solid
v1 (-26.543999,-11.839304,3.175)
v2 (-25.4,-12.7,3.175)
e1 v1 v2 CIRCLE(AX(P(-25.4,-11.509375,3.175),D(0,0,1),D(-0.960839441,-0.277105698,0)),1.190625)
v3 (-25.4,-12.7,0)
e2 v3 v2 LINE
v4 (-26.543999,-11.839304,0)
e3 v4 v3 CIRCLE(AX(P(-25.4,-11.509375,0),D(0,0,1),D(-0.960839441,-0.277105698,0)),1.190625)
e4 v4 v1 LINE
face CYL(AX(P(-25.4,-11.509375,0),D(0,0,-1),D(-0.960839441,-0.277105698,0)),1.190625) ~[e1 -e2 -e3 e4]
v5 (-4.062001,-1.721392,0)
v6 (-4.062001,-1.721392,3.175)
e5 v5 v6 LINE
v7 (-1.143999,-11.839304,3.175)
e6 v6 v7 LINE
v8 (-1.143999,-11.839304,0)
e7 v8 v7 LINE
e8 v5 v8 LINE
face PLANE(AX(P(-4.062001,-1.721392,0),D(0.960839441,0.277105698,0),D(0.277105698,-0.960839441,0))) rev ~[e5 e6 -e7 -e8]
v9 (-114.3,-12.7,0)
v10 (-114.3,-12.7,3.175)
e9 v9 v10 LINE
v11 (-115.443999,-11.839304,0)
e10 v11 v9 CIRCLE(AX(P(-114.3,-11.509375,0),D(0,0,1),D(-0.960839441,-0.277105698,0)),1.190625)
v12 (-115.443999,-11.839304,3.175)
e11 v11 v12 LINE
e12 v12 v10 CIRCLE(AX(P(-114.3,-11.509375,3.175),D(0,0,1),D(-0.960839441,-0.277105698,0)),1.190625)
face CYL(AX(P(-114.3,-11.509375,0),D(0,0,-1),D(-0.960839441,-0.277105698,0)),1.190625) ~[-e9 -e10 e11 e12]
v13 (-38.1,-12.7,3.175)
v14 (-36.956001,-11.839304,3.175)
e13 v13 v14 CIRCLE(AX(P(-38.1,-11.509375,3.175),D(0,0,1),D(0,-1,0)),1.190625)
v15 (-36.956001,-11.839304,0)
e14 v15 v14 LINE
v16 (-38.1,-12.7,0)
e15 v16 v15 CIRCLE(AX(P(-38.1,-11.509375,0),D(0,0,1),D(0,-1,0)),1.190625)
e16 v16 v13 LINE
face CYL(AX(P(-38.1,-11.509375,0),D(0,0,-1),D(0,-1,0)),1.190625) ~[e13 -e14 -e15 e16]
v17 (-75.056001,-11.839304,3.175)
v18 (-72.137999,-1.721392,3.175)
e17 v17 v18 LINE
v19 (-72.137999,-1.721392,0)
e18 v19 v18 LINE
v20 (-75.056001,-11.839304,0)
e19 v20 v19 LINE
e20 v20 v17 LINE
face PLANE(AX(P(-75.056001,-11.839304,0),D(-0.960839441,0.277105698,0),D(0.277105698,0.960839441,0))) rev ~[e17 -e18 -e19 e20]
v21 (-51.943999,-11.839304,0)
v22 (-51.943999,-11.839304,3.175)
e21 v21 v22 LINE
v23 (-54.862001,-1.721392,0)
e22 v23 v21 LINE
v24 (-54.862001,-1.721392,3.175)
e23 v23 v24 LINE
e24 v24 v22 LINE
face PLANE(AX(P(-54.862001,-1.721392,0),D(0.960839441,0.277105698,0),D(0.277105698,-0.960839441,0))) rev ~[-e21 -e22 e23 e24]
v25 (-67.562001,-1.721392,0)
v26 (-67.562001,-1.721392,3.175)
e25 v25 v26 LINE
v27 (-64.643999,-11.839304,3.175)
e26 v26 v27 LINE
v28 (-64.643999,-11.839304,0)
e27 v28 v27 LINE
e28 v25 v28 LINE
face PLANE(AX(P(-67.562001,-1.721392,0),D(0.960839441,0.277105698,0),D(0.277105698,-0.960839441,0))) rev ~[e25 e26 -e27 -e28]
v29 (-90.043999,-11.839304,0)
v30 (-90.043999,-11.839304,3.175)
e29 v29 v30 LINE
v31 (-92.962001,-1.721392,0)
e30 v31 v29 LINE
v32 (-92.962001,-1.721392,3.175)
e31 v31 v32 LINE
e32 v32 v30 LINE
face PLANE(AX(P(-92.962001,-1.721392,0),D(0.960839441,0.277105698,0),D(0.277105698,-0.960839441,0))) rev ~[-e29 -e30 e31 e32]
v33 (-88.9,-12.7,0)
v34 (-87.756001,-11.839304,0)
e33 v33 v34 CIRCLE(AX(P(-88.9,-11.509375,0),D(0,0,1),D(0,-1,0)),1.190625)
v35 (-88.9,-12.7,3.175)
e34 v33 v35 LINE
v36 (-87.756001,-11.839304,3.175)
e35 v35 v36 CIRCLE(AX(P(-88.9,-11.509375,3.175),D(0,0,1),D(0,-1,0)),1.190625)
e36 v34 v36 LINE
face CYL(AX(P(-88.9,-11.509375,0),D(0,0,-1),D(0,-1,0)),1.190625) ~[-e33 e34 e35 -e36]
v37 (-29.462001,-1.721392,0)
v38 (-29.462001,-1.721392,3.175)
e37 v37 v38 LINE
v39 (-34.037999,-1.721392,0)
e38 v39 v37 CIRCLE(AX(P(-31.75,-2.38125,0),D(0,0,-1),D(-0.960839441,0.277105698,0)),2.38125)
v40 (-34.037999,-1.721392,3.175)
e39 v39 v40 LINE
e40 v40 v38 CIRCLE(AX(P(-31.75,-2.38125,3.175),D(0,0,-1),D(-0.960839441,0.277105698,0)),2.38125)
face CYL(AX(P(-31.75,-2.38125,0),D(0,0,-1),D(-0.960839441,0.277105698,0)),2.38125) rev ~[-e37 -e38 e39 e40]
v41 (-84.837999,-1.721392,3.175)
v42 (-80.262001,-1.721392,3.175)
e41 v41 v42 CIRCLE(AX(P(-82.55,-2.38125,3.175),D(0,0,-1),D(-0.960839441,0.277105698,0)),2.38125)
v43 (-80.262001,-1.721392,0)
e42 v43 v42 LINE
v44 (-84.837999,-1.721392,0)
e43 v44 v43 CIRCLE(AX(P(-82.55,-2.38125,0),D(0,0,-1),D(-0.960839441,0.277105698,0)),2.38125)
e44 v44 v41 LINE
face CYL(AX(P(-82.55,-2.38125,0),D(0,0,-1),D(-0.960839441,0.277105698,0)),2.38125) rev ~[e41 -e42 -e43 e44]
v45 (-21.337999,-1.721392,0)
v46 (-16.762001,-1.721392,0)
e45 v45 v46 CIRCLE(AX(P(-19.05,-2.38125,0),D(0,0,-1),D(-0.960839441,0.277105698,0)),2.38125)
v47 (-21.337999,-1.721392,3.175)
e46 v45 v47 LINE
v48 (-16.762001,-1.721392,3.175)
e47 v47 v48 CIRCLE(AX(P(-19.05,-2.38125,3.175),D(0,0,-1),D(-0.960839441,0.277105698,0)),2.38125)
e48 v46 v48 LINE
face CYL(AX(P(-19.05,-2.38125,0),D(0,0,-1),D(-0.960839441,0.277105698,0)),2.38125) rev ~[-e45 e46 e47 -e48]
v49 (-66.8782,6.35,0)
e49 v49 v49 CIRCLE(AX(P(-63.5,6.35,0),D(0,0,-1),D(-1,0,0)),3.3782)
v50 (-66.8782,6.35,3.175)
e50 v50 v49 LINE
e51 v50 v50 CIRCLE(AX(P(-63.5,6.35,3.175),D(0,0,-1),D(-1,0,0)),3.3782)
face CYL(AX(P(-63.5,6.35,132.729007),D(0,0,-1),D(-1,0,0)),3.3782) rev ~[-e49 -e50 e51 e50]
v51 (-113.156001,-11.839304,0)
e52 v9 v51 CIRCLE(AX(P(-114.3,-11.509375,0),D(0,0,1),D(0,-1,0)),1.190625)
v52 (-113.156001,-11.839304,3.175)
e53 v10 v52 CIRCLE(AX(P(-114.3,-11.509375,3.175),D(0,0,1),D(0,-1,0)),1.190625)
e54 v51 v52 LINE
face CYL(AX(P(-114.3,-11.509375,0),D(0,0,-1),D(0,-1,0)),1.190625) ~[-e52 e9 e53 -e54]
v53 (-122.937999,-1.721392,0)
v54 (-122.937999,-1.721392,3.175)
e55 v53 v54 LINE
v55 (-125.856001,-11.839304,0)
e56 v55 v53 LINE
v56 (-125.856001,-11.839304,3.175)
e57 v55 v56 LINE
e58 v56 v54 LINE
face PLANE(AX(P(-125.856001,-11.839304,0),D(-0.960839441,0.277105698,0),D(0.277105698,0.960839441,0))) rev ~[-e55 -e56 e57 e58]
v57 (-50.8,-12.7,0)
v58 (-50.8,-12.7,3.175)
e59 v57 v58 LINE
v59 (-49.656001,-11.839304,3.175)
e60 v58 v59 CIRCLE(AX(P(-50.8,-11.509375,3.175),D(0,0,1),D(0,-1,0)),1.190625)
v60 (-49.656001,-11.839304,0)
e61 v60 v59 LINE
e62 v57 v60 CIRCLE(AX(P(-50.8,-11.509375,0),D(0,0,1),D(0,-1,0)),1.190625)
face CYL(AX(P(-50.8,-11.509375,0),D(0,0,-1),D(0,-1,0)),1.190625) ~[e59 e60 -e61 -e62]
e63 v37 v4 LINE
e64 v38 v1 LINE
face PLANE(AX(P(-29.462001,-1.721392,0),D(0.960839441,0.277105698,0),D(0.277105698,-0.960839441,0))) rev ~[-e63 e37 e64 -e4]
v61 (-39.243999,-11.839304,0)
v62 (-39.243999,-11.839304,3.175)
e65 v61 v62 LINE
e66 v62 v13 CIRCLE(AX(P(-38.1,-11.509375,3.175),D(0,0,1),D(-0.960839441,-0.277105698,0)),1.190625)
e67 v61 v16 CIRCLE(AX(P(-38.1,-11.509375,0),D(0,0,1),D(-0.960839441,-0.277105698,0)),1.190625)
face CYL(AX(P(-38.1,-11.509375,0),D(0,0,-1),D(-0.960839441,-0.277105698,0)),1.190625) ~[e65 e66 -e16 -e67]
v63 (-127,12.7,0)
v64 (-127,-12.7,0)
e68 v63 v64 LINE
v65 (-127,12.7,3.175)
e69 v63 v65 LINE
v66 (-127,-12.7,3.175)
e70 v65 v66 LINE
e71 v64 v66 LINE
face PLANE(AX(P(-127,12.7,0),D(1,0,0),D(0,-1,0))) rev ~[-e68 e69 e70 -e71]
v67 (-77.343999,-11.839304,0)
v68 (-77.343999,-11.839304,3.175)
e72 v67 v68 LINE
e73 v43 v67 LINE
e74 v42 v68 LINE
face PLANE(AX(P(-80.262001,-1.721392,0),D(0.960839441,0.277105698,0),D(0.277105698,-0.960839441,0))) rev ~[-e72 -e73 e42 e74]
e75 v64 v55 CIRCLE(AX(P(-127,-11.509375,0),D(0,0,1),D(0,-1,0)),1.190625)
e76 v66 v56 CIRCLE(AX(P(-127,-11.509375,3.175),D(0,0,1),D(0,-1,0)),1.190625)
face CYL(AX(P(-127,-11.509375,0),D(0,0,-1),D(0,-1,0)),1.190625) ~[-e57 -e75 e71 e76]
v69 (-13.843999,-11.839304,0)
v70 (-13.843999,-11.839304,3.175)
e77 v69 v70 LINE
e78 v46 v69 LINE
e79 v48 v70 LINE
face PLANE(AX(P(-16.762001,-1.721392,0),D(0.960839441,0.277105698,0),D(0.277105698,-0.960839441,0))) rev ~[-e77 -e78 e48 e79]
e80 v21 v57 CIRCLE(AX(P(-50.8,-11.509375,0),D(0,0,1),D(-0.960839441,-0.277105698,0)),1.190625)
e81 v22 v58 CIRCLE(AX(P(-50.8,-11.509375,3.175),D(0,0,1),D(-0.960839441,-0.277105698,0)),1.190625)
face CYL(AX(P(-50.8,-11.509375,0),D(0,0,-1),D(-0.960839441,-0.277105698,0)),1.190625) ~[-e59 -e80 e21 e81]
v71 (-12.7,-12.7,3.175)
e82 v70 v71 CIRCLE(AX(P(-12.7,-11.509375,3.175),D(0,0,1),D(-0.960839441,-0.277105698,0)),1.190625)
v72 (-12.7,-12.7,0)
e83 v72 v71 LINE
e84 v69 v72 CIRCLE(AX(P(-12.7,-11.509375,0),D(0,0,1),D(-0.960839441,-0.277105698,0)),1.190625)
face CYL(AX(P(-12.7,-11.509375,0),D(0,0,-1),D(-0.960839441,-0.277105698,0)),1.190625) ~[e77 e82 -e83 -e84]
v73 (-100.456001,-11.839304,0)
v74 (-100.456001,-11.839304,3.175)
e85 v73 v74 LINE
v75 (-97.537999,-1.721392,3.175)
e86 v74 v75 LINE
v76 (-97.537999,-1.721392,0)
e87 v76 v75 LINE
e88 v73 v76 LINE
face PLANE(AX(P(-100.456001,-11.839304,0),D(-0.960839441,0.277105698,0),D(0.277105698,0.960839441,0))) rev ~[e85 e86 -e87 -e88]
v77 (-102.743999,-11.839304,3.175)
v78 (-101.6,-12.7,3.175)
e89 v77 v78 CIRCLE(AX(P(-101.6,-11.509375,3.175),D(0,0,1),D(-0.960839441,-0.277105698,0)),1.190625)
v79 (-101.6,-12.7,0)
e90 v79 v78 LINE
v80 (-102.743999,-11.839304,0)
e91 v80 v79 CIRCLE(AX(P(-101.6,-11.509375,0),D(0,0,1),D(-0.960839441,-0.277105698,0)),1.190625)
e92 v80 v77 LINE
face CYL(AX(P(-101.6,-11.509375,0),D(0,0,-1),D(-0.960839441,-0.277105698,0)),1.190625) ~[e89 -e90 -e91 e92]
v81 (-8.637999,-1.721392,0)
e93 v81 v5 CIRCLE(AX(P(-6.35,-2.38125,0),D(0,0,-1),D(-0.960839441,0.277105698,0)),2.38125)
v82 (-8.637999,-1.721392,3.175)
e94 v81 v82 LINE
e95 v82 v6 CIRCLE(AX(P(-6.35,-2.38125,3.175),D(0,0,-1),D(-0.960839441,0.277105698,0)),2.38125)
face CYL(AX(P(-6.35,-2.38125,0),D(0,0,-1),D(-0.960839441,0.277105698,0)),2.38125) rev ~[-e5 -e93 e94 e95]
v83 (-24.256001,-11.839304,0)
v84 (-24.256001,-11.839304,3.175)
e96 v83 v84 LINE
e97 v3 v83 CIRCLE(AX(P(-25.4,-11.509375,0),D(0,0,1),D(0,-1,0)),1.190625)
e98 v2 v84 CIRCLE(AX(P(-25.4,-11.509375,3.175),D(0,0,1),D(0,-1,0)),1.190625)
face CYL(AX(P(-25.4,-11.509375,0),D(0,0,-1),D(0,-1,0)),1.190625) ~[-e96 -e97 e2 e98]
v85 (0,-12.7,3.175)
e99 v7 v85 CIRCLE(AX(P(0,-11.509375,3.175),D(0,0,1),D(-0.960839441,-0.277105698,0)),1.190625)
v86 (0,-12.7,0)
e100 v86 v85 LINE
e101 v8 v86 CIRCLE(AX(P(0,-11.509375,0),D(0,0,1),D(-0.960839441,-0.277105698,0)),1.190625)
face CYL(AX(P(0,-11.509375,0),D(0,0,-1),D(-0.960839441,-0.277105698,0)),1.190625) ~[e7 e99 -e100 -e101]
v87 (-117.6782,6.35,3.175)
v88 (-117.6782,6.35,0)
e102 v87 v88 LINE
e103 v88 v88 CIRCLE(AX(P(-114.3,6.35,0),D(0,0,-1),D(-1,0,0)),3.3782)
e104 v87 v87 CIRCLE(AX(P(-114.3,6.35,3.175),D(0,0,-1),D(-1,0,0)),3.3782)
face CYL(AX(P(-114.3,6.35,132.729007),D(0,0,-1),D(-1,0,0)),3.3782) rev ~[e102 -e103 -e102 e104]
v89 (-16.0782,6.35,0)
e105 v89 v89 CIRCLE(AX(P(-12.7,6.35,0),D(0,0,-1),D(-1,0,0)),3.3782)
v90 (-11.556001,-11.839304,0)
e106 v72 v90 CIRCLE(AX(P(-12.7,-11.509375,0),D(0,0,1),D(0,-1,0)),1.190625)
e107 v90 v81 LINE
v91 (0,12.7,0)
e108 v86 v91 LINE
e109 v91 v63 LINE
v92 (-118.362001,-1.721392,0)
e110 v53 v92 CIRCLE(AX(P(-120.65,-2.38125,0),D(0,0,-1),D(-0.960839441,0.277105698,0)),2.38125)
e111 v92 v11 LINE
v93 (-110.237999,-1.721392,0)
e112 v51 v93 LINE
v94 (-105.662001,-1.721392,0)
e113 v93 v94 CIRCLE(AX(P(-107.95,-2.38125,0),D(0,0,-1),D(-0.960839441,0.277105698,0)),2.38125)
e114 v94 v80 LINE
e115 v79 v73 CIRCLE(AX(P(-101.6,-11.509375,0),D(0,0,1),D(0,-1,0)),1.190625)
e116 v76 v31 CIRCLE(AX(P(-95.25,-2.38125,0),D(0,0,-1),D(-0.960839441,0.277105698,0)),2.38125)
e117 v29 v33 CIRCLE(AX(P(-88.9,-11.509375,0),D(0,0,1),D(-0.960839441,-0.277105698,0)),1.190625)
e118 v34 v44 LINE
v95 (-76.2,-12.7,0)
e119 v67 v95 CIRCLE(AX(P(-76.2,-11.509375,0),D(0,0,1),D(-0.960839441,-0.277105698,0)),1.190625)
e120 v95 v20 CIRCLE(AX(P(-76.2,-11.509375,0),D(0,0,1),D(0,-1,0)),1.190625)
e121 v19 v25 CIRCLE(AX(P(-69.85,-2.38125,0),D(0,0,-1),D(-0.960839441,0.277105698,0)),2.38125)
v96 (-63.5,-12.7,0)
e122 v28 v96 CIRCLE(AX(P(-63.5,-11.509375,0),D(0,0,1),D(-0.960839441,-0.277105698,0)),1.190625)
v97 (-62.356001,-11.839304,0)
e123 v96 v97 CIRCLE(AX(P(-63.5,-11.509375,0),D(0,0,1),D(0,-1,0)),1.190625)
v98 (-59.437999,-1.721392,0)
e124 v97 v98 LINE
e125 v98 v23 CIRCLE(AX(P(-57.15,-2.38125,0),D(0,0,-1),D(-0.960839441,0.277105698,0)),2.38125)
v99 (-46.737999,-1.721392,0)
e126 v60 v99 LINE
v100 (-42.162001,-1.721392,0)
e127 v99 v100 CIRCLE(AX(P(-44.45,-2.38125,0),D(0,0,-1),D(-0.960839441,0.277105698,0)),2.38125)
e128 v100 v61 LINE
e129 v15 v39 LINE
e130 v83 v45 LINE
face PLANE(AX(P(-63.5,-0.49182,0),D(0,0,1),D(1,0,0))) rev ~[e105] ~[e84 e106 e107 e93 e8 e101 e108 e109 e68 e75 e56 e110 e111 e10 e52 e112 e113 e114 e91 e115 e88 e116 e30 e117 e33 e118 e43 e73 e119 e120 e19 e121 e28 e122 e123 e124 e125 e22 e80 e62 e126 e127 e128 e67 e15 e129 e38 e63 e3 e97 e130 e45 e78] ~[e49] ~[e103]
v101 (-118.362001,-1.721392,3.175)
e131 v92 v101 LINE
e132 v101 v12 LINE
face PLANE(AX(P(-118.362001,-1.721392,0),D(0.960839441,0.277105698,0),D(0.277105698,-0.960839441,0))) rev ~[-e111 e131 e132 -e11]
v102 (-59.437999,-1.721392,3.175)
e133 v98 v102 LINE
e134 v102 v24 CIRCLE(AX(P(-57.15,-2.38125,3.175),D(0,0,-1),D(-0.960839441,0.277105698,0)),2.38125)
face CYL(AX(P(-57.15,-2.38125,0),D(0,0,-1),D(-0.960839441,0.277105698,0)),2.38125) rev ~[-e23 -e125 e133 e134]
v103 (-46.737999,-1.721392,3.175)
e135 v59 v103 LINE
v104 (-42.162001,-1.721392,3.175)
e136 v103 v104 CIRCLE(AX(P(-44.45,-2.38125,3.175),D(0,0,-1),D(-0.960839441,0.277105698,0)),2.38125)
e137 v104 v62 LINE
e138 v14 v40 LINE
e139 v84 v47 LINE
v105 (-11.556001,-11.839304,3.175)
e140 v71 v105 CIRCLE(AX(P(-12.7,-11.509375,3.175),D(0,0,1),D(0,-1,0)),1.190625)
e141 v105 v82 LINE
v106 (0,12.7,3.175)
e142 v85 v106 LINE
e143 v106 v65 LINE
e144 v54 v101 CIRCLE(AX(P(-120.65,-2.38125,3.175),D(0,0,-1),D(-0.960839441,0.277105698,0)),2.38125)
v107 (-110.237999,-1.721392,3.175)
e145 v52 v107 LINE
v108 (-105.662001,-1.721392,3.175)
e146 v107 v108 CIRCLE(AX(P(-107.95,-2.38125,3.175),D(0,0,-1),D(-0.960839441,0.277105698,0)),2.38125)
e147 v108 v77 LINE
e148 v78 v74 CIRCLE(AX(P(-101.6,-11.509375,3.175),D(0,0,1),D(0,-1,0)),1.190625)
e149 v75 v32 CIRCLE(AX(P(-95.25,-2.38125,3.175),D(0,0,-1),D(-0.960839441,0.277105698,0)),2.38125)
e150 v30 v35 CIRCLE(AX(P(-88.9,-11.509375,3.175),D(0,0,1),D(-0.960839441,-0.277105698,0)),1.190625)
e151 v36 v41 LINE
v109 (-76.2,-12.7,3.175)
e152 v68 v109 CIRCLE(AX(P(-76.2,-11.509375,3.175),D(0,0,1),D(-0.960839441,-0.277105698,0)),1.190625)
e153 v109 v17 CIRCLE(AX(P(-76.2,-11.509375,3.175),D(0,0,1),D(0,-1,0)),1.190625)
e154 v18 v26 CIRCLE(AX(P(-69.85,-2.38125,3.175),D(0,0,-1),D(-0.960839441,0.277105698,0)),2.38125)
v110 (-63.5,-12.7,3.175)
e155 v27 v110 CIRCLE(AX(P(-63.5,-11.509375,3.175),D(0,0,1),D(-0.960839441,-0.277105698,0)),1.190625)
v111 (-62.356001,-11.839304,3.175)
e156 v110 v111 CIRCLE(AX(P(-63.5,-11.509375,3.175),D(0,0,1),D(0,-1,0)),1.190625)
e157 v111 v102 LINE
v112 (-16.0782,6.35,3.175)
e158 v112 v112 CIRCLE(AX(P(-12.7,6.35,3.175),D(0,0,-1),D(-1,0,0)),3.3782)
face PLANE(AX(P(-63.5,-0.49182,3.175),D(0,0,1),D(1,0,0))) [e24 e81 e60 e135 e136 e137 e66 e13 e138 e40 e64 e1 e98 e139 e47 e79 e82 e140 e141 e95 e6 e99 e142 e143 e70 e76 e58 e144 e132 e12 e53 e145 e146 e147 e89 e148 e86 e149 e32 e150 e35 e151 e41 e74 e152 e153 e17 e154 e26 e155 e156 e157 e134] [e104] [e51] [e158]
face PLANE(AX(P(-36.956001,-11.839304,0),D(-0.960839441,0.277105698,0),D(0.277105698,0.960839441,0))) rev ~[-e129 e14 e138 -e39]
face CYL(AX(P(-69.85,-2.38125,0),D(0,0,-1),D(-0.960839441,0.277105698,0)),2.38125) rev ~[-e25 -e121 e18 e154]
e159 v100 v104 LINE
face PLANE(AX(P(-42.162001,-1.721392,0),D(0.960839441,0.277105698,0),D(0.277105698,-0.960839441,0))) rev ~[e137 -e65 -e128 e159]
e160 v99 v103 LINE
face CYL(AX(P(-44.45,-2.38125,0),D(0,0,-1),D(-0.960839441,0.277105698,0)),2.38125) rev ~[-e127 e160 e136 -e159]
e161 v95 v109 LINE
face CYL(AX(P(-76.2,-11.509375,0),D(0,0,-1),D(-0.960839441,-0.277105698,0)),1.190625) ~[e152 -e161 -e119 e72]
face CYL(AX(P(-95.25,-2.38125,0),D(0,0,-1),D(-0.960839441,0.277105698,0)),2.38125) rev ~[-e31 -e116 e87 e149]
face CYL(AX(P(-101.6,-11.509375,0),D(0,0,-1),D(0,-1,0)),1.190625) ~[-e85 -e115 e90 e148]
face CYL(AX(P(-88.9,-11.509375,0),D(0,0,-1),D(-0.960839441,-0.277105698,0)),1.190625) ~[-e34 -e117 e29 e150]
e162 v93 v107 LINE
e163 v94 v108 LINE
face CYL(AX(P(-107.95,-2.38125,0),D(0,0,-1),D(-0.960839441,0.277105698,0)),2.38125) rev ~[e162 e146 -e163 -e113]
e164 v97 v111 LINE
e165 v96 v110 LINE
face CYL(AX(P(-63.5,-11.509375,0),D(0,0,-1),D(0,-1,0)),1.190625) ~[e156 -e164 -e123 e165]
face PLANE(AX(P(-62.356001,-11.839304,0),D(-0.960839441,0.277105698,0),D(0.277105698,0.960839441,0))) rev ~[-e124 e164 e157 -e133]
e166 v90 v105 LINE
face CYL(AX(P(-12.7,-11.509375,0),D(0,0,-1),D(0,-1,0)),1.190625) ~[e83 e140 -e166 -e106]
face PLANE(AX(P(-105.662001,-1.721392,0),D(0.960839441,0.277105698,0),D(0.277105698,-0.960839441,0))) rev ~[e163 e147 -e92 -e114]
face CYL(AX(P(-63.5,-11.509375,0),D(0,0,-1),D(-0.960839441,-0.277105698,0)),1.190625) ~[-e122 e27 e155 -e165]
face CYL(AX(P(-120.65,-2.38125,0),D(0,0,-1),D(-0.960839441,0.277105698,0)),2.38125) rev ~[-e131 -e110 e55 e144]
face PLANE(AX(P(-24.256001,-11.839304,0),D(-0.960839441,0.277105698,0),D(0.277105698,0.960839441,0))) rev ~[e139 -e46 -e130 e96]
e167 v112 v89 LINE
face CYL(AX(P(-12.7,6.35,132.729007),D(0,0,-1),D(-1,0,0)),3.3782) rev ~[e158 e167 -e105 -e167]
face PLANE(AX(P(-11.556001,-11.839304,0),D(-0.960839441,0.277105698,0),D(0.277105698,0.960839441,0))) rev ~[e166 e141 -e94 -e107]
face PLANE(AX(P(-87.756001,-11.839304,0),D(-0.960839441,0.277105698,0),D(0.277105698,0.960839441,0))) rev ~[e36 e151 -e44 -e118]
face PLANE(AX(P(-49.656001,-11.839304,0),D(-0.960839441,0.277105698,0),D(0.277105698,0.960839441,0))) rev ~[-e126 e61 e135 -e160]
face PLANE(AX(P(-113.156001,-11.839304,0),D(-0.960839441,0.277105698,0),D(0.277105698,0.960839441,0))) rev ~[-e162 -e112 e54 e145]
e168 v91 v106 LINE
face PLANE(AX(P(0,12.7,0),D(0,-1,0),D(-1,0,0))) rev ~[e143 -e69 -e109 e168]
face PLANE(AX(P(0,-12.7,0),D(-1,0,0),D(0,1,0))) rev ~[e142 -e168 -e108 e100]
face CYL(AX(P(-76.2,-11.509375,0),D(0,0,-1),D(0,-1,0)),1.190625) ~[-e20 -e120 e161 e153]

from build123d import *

# Parameters (mm, degrees)
F1_DEPTH = 3.175
F3_D     = 6.7564


# Not quite as in the source:
# - a feature names something its author has since deleted; it is built from what else it names


with BuildPart() as f1:
    # F0 (on Top) → F1 (new body)
    with BuildSketch(Plane.XY):
        with BuildLine():
            Line((0, 0), (0, 12.7))
            Line((0, 12.7), (-127, 12.7))
            Line((-127, 12.7), (-127, 0))
            Line((-127, 0), (-127, -12.7))
            ThreePointArc((-127, -12.7), (-126.2841905951, -12.4607975068), (-125.8560005402, -11.839303972))
            Line((-125.8560005402, -11.839303972), (-122.9379989196, -1.7213920559))
            ThreePointArc((-122.9379989196, -1.7213920559), (-120.65, 0), (-118.3620010804, -1.7213920559))
            Line((-118.3620010804, -1.7213920559), (-115.4439994598, -11.839303972))
            ThreePointArc((-115.4439994598, -11.839303972), (-115.0158094049, -12.4607975068), (-114.3, -12.7))
            ThreePointArc((-114.3, -12.7), (-113.5841905951, -12.4607975068), (-113.1560005402, -11.839303972))
            Line((-113.1560005402, -11.839303972), (-110.2379989196, -1.7213920559))
            ThreePointArc((-110.2379989196, -1.7213920559), (-107.95, 0), (-105.6620010804, -1.7213920559))
            Line((-105.6620010804, -1.7213920559), (-102.7439994598, -11.839303972))
            ThreePointArc((-102.7439994598, -11.839303972), (-102.3158094049, -12.4607975068), (-101.6, -12.7))
            ThreePointArc((-101.6, -12.7), (-100.8841905951, -12.4607975068), (-100.4560005402, -11.839303972))
            Line((-100.4560005402, -11.839303972), (-97.5379989196, -1.7213920559))
            ThreePointArc((-97.5379989196, -1.7213920559), (-95.25, 0), (-92.9620010804, -1.7213920559))
            Line((-92.9620010804, -1.7213920559), (-90.0439994598, -11.839303972))
            ThreePointArc((-90.0439994598, -11.839303972), (-89.6158094049, -12.4607975068), (-88.9, -12.7))
            ThreePointArc((-88.9, -12.7), (-88.1841905951, -12.4607975068), (-87.7560005402, -11.839303972))
            Line((-87.7560005402, -11.839303972), (-84.8379989196, -1.7213920559))
            ThreePointArc((-84.8379989196, -1.7213920559), (-82.55, 0), (-80.2620010804, -1.7213920559))
            Line((-80.2620010804, -1.7213920559), (-77.3439994598, -11.839303972))
            ThreePointArc((-77.3439994598, -11.839303972), (-76.9158094049, -12.4607975068), (-76.2, -12.7))
            ThreePointArc((-76.2, -12.7), (-75.4841905951, -12.4607975068), (-75.0560005402, -11.839303972))
            Line((-75.0560005402, -11.839303972), (-72.1379989196, -1.7213920559))
            ThreePointArc((-72.1379989196, -1.7213920559), (-69.85, 0), (-67.5620010804, -1.7213920559))
            Line((-67.5620010804, -1.7213920559), (-64.6439994598, -11.839303972))
            ThreePointArc((-64.6439994598, -11.839303972), (-64.2158094049, -12.4607975068), (-63.5, -12.7))
            ThreePointArc((-63.5, -12.7), (-62.7841905951, -12.4607975068), (-62.3560005402, -11.839303972))
            Line((-62.3560005402, -11.839303972), (-59.4379989196, -1.7213920559))
            ThreePointArc((-59.4379989196, -1.7213920559), (-57.15, 0), (-54.8620010804, -1.7213920559))
            Line((-54.8620010804, -1.7213920559), (-51.9439994598, -11.839303972))
            ThreePointArc((-51.9439994598, -11.839303972), (-51.5158094049, -12.4607975068), (-50.8, -12.7))
            ThreePointArc((-50.8, -12.7), (-50.0841905951, -12.4607975068), (-49.6560005402, -11.839303972))
            Line((-49.6560005402, -11.839303972), (-46.7379989196, -1.7213920559))
            ThreePointArc((-46.7379989196, -1.7213920559), (-44.45, 0), (-42.1620010804, -1.7213920559))
            Line((-42.1620010804, -1.7213920559), (-39.2439994598, -11.839303972))
            ThreePointArc((-39.2439994598, -11.839303972), (-38.8158094049, -12.4607975068), (-38.1, -12.7))
            ThreePointArc((-38.1, -12.7), (-37.3841905951, -12.4607975068), (-36.9560005402, -11.839303972))
            Line((-36.9560005402, -11.839303972), (-34.0379989196, -1.7213920559))
            ThreePointArc((-34.0379989196, -1.7213920559), (-31.75, 0), (-29.4620010804, -1.7213920559))
            Line((-29.4620010804, -1.7213920559), (-26.5439994598, -11.839303972))
            ThreePointArc((-26.5439994598, -11.839303972), (-26.1158094049, -12.4607975068), (-25.4, -12.7))
            ThreePointArc((-25.4, -12.7), (-24.6841905951, -12.4607975068), (-24.2560005402, -11.839303972))
            Line((-24.2560005402, -11.839303972), (-21.3379989196, -1.7213920559))
            ThreePointArc((-21.3379989196, -1.7213920559), (-19.05, 0), (-16.7620010804, -1.7213920559))
            Line((-16.7620010804, -1.7213920559), (-13.8439994598, -11.839303972))
            ThreePointArc((-13.8439994598, -11.839303972), (-13.4158094049, -12.4607975068), (-12.7, -12.7))
            ThreePointArc((-12.7, -12.7), (-11.9841905951, -12.4607975068), (-11.5560005402, -11.839303972))
            Line((-11.5560005402, -11.839303972), (-8.6379989196, -1.7213920559))
            ThreePointArc((-8.6379989196, -1.7213920559), (-6.35, 0), (-4.0620010804, -1.7213920559))
            Line((-4.0620010804, -1.7213920559), (-1.1439994598, -11.839303972))
            ThreePointArc((-1.1439994598, -11.839303972), (-0.7158094049, -12.4607975068), (0, -12.7))
            Line((0, -12.7), (0, 0))
        make_face()
    extrude(amount=F1_DEPTH)

    # F3 (through all)
    with Locations(Plane.XY.offset(3.175)):
        with Locations((-114.3, 6.35), (-63.5, 6.35), (-12.7, 6.35)):
            Hole(F3_D / 2)


solid = f1.part
